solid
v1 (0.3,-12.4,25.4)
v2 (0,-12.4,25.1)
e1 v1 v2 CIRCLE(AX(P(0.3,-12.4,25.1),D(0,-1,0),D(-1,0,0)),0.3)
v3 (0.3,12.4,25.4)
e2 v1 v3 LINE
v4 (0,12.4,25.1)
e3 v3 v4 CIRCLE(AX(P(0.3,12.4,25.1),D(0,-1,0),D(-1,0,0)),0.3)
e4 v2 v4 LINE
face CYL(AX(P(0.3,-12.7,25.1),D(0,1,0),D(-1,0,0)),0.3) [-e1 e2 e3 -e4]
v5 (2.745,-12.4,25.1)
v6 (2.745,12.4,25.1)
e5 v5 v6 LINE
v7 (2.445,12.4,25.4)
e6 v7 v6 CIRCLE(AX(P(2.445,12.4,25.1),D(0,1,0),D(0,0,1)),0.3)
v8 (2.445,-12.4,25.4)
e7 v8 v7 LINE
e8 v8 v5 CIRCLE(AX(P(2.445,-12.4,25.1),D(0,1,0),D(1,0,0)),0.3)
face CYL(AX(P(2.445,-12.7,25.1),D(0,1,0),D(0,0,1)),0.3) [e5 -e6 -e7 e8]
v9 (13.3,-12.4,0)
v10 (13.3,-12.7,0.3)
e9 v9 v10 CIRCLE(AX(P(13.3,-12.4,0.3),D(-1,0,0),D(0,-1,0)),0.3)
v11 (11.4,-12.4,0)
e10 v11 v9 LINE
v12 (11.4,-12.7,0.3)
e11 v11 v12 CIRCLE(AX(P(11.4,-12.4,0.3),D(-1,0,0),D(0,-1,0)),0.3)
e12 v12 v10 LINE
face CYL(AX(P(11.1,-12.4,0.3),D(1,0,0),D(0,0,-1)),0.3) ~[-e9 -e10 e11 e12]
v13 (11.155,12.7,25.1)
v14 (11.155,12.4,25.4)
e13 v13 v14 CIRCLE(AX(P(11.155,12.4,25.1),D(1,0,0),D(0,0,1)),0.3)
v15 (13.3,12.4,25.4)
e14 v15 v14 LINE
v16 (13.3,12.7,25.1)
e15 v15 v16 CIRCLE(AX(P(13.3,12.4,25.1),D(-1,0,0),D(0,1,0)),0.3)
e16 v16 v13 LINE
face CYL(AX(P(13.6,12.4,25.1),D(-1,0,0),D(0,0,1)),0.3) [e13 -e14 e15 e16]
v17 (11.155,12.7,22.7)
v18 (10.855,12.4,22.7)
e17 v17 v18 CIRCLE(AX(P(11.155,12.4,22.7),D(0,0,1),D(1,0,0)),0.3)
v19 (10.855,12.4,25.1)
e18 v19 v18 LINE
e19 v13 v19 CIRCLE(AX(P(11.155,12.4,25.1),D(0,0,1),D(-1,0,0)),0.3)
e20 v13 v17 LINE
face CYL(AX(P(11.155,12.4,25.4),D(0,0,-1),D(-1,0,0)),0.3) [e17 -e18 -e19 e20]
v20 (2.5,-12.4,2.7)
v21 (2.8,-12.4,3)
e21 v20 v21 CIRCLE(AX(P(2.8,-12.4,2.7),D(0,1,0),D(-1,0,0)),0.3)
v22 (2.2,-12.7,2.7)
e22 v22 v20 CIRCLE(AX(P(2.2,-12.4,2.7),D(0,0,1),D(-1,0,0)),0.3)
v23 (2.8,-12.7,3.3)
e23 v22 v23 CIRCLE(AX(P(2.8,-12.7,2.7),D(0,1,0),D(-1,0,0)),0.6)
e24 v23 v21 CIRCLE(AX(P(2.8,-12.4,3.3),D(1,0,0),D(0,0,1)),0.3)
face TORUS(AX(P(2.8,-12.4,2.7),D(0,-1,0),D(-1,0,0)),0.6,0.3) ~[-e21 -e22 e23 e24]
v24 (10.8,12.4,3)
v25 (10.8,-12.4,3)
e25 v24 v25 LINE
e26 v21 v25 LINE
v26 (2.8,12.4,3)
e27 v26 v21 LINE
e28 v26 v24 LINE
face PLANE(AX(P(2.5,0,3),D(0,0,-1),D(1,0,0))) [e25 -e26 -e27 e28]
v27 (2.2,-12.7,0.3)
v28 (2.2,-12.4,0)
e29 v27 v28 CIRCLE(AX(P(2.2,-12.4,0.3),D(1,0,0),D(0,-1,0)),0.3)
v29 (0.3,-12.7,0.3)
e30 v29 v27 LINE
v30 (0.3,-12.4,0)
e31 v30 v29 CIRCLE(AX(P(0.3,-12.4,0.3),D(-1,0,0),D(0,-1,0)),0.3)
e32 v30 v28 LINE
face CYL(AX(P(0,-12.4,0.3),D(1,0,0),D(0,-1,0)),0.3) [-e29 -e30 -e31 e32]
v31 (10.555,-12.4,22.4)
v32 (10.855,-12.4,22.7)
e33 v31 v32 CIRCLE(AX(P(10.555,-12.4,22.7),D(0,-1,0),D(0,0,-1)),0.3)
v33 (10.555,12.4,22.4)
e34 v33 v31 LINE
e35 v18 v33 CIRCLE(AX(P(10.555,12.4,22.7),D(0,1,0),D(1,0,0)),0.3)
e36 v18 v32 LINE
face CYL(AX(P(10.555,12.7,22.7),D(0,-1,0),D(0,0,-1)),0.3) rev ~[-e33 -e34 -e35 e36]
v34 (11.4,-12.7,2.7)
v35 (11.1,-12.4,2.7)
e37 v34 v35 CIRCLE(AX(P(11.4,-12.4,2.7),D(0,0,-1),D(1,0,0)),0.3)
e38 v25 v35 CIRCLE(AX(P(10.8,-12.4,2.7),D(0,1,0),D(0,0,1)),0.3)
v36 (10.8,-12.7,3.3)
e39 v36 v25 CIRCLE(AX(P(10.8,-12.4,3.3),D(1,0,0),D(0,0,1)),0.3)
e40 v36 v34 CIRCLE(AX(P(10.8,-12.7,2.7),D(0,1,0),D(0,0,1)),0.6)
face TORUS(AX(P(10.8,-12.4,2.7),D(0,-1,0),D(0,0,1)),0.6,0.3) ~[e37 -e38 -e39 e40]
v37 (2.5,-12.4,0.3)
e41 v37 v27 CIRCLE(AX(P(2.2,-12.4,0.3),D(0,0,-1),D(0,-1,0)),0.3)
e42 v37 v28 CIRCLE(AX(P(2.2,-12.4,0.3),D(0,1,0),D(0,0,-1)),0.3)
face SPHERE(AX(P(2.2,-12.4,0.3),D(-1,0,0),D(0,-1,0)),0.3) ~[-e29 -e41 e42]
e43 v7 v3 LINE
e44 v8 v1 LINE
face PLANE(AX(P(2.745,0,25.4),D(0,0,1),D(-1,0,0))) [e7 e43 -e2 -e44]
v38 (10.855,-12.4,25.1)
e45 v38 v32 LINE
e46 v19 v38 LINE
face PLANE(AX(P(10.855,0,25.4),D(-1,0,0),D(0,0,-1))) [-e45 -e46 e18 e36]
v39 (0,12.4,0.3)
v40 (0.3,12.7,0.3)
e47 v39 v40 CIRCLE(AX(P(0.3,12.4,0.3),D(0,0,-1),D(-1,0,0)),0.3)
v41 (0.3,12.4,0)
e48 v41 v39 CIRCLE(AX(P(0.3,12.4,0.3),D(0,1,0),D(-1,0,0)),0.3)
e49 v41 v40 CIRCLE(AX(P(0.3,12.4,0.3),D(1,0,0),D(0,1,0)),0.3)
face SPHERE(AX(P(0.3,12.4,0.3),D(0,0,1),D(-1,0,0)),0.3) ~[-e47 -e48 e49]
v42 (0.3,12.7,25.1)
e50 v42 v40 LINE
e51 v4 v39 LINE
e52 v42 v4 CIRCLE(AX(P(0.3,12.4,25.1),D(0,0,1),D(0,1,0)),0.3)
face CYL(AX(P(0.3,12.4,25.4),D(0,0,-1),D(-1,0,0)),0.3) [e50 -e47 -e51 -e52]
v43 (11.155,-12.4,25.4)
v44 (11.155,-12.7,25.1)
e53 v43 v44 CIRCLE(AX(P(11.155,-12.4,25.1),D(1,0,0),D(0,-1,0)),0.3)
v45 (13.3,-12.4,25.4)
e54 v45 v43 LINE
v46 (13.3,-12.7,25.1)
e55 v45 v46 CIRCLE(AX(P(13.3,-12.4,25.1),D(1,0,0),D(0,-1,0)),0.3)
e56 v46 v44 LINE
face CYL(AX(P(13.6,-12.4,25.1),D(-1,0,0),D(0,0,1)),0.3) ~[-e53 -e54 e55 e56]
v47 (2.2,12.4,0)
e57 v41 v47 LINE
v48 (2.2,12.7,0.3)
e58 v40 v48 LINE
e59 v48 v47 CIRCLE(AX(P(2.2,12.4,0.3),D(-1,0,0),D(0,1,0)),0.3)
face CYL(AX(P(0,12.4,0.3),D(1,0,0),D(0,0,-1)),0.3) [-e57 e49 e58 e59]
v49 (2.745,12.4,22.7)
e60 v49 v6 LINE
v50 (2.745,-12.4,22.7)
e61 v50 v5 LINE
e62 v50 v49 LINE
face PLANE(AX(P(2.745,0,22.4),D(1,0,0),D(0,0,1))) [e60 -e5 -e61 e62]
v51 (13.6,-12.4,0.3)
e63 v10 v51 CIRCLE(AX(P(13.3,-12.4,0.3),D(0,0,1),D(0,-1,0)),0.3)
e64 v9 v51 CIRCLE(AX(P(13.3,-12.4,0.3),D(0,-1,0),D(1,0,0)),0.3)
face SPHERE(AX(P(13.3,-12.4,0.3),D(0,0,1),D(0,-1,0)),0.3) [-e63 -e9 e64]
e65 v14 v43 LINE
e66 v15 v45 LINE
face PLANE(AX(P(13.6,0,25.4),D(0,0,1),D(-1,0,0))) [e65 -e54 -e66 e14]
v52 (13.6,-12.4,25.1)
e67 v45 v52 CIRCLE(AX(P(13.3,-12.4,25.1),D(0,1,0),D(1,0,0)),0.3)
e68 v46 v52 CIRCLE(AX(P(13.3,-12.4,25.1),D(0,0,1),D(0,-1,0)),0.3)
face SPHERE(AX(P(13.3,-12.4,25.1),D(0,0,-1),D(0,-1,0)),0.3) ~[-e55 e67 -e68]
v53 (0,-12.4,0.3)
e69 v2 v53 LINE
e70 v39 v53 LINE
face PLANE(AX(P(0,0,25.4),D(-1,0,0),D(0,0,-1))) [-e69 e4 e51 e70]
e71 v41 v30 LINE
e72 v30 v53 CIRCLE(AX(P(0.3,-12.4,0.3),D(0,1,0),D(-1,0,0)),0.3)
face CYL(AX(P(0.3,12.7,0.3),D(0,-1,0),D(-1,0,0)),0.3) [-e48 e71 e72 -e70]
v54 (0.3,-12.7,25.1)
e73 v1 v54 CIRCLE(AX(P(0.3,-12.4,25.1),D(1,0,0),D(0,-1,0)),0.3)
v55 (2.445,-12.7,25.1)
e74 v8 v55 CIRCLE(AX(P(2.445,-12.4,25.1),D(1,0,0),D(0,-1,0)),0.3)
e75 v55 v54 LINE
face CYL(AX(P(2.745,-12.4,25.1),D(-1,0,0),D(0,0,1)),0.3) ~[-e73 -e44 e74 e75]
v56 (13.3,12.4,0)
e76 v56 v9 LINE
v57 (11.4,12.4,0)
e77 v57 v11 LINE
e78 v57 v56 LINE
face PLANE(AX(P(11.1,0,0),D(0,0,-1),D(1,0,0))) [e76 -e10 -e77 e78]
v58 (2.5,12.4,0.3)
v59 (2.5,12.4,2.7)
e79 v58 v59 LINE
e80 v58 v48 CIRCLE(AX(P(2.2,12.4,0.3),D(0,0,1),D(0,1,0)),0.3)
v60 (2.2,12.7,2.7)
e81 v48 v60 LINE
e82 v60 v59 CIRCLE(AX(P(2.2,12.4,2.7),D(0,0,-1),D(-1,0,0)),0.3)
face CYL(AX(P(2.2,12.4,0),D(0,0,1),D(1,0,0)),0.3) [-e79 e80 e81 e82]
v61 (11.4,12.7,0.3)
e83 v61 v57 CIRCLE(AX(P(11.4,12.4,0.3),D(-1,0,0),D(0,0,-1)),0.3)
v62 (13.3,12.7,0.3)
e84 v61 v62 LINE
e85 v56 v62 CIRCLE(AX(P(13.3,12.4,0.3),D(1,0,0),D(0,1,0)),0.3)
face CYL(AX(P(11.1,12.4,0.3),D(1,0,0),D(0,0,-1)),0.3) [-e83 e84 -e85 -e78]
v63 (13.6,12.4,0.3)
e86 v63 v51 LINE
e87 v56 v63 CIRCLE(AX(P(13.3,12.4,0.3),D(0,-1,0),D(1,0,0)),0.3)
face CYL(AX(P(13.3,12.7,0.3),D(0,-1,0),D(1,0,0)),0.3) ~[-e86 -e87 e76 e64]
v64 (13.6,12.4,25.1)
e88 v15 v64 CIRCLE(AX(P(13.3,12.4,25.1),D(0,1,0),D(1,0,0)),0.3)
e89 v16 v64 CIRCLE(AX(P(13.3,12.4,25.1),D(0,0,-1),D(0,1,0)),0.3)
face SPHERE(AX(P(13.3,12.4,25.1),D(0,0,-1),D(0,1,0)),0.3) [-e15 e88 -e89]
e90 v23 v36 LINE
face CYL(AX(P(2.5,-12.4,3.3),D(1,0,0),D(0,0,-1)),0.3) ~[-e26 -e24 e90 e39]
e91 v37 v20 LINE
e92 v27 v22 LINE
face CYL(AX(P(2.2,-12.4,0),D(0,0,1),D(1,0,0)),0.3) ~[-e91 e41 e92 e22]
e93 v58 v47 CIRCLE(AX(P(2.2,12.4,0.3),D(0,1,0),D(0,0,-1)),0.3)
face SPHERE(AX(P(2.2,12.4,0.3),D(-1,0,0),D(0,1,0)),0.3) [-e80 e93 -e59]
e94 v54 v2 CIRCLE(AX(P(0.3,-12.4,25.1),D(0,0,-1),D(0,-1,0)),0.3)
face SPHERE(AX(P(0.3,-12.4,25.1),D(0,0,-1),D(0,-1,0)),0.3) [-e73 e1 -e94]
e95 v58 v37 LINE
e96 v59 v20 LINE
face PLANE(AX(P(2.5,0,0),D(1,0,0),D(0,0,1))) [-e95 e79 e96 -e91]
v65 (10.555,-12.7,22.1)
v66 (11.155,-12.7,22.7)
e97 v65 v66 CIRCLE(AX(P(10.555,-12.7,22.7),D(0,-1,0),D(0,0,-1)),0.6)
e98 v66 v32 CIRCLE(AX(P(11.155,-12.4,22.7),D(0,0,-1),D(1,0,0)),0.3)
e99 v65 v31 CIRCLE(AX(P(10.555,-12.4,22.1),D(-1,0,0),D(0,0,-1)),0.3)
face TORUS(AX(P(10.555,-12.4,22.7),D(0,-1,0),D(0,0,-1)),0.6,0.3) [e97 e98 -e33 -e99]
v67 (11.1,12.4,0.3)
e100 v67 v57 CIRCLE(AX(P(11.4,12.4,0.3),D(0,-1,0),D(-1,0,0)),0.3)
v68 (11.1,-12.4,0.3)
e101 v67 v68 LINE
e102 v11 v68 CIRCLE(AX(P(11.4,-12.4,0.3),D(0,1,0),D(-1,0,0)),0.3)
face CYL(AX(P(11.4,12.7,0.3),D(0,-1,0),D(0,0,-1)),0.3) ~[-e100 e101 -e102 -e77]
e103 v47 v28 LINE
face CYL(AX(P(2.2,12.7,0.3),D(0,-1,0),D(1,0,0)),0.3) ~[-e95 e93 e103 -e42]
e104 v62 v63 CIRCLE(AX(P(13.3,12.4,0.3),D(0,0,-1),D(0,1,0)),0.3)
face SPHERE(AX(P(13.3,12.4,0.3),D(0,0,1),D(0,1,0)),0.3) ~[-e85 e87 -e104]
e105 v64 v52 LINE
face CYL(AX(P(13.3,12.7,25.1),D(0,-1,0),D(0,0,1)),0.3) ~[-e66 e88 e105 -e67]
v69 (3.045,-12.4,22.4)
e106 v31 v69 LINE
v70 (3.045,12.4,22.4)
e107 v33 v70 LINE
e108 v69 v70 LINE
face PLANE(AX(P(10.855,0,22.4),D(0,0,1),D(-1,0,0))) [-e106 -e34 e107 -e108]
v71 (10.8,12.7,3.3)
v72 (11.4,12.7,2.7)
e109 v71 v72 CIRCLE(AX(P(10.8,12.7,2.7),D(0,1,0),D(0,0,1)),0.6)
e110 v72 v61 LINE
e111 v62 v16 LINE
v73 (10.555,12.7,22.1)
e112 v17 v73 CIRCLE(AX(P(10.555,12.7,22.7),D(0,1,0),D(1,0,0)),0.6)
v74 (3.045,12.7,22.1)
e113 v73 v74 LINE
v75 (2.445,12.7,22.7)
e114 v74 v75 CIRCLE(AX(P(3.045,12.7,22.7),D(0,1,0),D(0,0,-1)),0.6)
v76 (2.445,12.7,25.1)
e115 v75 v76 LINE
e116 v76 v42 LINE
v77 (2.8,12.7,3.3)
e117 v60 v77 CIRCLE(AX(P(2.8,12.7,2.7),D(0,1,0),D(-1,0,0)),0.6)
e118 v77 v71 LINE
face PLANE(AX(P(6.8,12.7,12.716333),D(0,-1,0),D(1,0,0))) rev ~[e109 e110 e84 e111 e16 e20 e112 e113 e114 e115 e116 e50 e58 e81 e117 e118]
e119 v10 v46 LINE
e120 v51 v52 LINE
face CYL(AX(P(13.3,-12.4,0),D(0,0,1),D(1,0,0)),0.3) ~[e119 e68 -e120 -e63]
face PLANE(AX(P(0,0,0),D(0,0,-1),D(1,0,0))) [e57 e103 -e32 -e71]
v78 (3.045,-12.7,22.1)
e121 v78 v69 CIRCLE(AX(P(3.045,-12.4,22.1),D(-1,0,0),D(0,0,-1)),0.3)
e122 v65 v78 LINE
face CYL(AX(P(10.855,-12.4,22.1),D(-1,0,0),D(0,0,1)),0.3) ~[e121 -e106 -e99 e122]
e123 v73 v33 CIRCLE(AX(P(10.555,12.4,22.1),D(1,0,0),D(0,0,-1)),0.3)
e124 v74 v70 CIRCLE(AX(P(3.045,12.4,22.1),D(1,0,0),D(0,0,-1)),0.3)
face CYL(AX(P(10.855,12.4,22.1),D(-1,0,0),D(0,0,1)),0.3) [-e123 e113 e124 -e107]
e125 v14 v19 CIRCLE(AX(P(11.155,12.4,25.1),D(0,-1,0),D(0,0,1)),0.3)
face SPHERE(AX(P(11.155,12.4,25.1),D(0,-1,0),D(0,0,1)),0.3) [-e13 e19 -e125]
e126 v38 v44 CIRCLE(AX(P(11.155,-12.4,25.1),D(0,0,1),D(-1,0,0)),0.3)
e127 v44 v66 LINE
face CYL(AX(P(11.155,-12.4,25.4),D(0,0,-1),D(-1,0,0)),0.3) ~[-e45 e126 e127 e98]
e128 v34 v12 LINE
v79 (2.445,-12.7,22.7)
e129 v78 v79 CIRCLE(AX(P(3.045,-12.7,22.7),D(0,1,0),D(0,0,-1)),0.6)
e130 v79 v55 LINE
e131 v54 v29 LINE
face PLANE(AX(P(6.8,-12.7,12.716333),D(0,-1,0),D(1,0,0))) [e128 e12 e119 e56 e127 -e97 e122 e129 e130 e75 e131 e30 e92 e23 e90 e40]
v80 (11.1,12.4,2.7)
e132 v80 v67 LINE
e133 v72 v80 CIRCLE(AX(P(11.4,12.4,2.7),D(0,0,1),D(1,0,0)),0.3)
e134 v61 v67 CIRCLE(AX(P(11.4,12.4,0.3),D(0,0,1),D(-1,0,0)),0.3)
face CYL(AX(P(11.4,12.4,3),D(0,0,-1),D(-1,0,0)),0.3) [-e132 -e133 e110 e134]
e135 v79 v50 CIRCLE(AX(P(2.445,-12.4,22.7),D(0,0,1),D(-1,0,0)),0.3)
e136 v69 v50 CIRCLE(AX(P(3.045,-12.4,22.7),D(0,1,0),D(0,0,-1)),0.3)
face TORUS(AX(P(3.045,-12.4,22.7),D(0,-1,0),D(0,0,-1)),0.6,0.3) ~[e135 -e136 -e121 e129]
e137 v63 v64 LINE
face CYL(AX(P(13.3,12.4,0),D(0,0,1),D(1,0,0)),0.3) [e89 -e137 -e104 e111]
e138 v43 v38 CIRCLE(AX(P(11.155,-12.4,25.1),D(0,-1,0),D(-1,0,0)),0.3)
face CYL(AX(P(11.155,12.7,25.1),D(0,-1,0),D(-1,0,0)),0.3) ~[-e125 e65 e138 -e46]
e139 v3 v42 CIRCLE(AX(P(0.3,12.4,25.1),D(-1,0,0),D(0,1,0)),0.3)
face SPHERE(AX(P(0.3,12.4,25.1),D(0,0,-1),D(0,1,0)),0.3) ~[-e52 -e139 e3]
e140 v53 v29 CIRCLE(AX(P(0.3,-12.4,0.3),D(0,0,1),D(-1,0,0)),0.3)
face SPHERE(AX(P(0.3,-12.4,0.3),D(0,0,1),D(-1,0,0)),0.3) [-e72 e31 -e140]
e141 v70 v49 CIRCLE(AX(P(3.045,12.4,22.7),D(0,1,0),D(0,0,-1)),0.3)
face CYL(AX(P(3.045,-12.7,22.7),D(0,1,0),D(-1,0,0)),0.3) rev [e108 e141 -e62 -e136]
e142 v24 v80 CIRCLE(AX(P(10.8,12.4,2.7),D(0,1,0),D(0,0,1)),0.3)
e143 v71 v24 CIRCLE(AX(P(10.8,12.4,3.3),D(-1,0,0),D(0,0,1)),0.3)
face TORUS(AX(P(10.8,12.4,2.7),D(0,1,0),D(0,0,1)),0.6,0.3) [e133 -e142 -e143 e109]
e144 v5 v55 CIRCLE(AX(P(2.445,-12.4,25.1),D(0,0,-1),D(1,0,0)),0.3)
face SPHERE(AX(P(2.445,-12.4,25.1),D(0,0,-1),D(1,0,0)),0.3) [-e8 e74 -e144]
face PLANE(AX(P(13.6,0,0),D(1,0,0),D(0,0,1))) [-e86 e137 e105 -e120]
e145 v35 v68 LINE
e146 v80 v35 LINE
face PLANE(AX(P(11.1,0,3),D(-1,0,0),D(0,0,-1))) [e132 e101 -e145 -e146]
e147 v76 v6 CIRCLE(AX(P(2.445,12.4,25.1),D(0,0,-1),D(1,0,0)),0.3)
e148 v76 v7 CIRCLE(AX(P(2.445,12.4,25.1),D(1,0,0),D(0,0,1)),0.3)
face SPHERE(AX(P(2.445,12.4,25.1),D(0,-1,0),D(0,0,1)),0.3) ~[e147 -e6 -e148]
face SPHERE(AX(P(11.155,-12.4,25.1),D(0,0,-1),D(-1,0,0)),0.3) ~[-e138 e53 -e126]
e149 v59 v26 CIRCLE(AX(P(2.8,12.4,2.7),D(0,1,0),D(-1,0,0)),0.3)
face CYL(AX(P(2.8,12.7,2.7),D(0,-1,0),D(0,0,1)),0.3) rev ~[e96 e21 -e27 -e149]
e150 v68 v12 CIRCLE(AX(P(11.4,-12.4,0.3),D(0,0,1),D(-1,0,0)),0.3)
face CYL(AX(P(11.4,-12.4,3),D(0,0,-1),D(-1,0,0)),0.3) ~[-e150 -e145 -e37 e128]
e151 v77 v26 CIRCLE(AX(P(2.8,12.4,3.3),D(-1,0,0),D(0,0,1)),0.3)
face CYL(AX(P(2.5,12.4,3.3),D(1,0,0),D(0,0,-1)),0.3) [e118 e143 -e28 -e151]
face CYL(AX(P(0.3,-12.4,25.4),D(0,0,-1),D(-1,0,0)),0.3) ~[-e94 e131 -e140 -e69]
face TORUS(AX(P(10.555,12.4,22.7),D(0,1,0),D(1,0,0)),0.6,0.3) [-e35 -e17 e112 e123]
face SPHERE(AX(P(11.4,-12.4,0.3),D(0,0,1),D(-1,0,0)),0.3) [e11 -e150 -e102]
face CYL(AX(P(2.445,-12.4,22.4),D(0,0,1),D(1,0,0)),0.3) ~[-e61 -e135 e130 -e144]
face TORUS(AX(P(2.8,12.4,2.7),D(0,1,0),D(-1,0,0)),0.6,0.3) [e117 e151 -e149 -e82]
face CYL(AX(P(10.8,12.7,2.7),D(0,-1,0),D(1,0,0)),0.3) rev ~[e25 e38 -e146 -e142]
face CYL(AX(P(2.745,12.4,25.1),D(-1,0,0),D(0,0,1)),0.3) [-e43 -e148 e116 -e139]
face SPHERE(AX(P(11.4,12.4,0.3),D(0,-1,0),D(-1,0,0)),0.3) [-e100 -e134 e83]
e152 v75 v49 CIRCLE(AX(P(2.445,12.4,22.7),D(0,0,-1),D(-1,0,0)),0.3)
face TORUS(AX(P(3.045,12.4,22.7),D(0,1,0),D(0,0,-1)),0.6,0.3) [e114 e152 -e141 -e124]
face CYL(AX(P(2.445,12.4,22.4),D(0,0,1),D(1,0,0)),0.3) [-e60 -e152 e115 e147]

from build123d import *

# Parameters (mm, degrees)
F1_DEPTH = 12.7
F2_R     = 0.3


# Not quite as in the source:
# - a feature names something its author has since deleted; it is built from what else it names


with BuildPart() as f1:
    # F0 (on Front) → F1 (new body, symmetric)
    with BuildSketch(Plane.XZ):
        Polygon((0, 25.4), (0, 0), (2.5, 0), (2.5, 3), (11.1, 3), (11.1, 0), (13.6, 0), (13.6, 25.4), (10.855, 25.4), (10.855, 22.4), (2.745, 22.4), (2.745, 25.4), align=None)
    extrude(amount=F1_DEPTH, both=True)

    # F2
    f2_edges = [f1.edges().sort_by_distance(p)[0] for p in [
        (0, 12.7, 12.7),
        (0, -12.7, 12.7),
        (0, 0, 0),
        (1.25, -12.7, 0),
        (13.6, -12.7, 12.7),
        (13.6, 12.7, 12.7),
        (1.25, 12.7, 0),
        (6.8, -12.7, 22.4),
        (2.745, -12.7, 23.9),
        (2.745, 0, 25.4),
        (10.855, -12.7, 23.9),
        (10.855, 0, 25.4),
        (2.745, 0, 22.4),
        (6.8, 12.7, 22.4),
        (10.855, 0, 22.4),
        (2.5, 0, 3),
        (2.5, -12.7, 1.5),
        (6.8, -12.7, 3),
        (11.1, -12.7, 1.5),
        (11.1, 0, 0),
        (12.35, -12.7, 0),
        (2.5, 12.7, 1.5),
        (6.8, 12.7, 3),
        (11.1, 12.7, 1.5),
        (11.1, 0, 3),
        (12.2275, -12.7, 25.4),
        (1.3725, -12.7, 25.4),
        (1.3725, 12.7, 25.4),
        (12.2275, 12.7, 25.4),
        (12.35, 12.7, 0),
        (0, 0, 25.4),
        (2.745, 12.7, 23.9),
        (10.855, 12.7, 23.9),
        (13.6, 0, 25.4),
        (13.6, 0, 0),
        (2.5, 0, 0),
    ]]
    fillet(f2_edges, radius=F2_R)


solid = f1.part
